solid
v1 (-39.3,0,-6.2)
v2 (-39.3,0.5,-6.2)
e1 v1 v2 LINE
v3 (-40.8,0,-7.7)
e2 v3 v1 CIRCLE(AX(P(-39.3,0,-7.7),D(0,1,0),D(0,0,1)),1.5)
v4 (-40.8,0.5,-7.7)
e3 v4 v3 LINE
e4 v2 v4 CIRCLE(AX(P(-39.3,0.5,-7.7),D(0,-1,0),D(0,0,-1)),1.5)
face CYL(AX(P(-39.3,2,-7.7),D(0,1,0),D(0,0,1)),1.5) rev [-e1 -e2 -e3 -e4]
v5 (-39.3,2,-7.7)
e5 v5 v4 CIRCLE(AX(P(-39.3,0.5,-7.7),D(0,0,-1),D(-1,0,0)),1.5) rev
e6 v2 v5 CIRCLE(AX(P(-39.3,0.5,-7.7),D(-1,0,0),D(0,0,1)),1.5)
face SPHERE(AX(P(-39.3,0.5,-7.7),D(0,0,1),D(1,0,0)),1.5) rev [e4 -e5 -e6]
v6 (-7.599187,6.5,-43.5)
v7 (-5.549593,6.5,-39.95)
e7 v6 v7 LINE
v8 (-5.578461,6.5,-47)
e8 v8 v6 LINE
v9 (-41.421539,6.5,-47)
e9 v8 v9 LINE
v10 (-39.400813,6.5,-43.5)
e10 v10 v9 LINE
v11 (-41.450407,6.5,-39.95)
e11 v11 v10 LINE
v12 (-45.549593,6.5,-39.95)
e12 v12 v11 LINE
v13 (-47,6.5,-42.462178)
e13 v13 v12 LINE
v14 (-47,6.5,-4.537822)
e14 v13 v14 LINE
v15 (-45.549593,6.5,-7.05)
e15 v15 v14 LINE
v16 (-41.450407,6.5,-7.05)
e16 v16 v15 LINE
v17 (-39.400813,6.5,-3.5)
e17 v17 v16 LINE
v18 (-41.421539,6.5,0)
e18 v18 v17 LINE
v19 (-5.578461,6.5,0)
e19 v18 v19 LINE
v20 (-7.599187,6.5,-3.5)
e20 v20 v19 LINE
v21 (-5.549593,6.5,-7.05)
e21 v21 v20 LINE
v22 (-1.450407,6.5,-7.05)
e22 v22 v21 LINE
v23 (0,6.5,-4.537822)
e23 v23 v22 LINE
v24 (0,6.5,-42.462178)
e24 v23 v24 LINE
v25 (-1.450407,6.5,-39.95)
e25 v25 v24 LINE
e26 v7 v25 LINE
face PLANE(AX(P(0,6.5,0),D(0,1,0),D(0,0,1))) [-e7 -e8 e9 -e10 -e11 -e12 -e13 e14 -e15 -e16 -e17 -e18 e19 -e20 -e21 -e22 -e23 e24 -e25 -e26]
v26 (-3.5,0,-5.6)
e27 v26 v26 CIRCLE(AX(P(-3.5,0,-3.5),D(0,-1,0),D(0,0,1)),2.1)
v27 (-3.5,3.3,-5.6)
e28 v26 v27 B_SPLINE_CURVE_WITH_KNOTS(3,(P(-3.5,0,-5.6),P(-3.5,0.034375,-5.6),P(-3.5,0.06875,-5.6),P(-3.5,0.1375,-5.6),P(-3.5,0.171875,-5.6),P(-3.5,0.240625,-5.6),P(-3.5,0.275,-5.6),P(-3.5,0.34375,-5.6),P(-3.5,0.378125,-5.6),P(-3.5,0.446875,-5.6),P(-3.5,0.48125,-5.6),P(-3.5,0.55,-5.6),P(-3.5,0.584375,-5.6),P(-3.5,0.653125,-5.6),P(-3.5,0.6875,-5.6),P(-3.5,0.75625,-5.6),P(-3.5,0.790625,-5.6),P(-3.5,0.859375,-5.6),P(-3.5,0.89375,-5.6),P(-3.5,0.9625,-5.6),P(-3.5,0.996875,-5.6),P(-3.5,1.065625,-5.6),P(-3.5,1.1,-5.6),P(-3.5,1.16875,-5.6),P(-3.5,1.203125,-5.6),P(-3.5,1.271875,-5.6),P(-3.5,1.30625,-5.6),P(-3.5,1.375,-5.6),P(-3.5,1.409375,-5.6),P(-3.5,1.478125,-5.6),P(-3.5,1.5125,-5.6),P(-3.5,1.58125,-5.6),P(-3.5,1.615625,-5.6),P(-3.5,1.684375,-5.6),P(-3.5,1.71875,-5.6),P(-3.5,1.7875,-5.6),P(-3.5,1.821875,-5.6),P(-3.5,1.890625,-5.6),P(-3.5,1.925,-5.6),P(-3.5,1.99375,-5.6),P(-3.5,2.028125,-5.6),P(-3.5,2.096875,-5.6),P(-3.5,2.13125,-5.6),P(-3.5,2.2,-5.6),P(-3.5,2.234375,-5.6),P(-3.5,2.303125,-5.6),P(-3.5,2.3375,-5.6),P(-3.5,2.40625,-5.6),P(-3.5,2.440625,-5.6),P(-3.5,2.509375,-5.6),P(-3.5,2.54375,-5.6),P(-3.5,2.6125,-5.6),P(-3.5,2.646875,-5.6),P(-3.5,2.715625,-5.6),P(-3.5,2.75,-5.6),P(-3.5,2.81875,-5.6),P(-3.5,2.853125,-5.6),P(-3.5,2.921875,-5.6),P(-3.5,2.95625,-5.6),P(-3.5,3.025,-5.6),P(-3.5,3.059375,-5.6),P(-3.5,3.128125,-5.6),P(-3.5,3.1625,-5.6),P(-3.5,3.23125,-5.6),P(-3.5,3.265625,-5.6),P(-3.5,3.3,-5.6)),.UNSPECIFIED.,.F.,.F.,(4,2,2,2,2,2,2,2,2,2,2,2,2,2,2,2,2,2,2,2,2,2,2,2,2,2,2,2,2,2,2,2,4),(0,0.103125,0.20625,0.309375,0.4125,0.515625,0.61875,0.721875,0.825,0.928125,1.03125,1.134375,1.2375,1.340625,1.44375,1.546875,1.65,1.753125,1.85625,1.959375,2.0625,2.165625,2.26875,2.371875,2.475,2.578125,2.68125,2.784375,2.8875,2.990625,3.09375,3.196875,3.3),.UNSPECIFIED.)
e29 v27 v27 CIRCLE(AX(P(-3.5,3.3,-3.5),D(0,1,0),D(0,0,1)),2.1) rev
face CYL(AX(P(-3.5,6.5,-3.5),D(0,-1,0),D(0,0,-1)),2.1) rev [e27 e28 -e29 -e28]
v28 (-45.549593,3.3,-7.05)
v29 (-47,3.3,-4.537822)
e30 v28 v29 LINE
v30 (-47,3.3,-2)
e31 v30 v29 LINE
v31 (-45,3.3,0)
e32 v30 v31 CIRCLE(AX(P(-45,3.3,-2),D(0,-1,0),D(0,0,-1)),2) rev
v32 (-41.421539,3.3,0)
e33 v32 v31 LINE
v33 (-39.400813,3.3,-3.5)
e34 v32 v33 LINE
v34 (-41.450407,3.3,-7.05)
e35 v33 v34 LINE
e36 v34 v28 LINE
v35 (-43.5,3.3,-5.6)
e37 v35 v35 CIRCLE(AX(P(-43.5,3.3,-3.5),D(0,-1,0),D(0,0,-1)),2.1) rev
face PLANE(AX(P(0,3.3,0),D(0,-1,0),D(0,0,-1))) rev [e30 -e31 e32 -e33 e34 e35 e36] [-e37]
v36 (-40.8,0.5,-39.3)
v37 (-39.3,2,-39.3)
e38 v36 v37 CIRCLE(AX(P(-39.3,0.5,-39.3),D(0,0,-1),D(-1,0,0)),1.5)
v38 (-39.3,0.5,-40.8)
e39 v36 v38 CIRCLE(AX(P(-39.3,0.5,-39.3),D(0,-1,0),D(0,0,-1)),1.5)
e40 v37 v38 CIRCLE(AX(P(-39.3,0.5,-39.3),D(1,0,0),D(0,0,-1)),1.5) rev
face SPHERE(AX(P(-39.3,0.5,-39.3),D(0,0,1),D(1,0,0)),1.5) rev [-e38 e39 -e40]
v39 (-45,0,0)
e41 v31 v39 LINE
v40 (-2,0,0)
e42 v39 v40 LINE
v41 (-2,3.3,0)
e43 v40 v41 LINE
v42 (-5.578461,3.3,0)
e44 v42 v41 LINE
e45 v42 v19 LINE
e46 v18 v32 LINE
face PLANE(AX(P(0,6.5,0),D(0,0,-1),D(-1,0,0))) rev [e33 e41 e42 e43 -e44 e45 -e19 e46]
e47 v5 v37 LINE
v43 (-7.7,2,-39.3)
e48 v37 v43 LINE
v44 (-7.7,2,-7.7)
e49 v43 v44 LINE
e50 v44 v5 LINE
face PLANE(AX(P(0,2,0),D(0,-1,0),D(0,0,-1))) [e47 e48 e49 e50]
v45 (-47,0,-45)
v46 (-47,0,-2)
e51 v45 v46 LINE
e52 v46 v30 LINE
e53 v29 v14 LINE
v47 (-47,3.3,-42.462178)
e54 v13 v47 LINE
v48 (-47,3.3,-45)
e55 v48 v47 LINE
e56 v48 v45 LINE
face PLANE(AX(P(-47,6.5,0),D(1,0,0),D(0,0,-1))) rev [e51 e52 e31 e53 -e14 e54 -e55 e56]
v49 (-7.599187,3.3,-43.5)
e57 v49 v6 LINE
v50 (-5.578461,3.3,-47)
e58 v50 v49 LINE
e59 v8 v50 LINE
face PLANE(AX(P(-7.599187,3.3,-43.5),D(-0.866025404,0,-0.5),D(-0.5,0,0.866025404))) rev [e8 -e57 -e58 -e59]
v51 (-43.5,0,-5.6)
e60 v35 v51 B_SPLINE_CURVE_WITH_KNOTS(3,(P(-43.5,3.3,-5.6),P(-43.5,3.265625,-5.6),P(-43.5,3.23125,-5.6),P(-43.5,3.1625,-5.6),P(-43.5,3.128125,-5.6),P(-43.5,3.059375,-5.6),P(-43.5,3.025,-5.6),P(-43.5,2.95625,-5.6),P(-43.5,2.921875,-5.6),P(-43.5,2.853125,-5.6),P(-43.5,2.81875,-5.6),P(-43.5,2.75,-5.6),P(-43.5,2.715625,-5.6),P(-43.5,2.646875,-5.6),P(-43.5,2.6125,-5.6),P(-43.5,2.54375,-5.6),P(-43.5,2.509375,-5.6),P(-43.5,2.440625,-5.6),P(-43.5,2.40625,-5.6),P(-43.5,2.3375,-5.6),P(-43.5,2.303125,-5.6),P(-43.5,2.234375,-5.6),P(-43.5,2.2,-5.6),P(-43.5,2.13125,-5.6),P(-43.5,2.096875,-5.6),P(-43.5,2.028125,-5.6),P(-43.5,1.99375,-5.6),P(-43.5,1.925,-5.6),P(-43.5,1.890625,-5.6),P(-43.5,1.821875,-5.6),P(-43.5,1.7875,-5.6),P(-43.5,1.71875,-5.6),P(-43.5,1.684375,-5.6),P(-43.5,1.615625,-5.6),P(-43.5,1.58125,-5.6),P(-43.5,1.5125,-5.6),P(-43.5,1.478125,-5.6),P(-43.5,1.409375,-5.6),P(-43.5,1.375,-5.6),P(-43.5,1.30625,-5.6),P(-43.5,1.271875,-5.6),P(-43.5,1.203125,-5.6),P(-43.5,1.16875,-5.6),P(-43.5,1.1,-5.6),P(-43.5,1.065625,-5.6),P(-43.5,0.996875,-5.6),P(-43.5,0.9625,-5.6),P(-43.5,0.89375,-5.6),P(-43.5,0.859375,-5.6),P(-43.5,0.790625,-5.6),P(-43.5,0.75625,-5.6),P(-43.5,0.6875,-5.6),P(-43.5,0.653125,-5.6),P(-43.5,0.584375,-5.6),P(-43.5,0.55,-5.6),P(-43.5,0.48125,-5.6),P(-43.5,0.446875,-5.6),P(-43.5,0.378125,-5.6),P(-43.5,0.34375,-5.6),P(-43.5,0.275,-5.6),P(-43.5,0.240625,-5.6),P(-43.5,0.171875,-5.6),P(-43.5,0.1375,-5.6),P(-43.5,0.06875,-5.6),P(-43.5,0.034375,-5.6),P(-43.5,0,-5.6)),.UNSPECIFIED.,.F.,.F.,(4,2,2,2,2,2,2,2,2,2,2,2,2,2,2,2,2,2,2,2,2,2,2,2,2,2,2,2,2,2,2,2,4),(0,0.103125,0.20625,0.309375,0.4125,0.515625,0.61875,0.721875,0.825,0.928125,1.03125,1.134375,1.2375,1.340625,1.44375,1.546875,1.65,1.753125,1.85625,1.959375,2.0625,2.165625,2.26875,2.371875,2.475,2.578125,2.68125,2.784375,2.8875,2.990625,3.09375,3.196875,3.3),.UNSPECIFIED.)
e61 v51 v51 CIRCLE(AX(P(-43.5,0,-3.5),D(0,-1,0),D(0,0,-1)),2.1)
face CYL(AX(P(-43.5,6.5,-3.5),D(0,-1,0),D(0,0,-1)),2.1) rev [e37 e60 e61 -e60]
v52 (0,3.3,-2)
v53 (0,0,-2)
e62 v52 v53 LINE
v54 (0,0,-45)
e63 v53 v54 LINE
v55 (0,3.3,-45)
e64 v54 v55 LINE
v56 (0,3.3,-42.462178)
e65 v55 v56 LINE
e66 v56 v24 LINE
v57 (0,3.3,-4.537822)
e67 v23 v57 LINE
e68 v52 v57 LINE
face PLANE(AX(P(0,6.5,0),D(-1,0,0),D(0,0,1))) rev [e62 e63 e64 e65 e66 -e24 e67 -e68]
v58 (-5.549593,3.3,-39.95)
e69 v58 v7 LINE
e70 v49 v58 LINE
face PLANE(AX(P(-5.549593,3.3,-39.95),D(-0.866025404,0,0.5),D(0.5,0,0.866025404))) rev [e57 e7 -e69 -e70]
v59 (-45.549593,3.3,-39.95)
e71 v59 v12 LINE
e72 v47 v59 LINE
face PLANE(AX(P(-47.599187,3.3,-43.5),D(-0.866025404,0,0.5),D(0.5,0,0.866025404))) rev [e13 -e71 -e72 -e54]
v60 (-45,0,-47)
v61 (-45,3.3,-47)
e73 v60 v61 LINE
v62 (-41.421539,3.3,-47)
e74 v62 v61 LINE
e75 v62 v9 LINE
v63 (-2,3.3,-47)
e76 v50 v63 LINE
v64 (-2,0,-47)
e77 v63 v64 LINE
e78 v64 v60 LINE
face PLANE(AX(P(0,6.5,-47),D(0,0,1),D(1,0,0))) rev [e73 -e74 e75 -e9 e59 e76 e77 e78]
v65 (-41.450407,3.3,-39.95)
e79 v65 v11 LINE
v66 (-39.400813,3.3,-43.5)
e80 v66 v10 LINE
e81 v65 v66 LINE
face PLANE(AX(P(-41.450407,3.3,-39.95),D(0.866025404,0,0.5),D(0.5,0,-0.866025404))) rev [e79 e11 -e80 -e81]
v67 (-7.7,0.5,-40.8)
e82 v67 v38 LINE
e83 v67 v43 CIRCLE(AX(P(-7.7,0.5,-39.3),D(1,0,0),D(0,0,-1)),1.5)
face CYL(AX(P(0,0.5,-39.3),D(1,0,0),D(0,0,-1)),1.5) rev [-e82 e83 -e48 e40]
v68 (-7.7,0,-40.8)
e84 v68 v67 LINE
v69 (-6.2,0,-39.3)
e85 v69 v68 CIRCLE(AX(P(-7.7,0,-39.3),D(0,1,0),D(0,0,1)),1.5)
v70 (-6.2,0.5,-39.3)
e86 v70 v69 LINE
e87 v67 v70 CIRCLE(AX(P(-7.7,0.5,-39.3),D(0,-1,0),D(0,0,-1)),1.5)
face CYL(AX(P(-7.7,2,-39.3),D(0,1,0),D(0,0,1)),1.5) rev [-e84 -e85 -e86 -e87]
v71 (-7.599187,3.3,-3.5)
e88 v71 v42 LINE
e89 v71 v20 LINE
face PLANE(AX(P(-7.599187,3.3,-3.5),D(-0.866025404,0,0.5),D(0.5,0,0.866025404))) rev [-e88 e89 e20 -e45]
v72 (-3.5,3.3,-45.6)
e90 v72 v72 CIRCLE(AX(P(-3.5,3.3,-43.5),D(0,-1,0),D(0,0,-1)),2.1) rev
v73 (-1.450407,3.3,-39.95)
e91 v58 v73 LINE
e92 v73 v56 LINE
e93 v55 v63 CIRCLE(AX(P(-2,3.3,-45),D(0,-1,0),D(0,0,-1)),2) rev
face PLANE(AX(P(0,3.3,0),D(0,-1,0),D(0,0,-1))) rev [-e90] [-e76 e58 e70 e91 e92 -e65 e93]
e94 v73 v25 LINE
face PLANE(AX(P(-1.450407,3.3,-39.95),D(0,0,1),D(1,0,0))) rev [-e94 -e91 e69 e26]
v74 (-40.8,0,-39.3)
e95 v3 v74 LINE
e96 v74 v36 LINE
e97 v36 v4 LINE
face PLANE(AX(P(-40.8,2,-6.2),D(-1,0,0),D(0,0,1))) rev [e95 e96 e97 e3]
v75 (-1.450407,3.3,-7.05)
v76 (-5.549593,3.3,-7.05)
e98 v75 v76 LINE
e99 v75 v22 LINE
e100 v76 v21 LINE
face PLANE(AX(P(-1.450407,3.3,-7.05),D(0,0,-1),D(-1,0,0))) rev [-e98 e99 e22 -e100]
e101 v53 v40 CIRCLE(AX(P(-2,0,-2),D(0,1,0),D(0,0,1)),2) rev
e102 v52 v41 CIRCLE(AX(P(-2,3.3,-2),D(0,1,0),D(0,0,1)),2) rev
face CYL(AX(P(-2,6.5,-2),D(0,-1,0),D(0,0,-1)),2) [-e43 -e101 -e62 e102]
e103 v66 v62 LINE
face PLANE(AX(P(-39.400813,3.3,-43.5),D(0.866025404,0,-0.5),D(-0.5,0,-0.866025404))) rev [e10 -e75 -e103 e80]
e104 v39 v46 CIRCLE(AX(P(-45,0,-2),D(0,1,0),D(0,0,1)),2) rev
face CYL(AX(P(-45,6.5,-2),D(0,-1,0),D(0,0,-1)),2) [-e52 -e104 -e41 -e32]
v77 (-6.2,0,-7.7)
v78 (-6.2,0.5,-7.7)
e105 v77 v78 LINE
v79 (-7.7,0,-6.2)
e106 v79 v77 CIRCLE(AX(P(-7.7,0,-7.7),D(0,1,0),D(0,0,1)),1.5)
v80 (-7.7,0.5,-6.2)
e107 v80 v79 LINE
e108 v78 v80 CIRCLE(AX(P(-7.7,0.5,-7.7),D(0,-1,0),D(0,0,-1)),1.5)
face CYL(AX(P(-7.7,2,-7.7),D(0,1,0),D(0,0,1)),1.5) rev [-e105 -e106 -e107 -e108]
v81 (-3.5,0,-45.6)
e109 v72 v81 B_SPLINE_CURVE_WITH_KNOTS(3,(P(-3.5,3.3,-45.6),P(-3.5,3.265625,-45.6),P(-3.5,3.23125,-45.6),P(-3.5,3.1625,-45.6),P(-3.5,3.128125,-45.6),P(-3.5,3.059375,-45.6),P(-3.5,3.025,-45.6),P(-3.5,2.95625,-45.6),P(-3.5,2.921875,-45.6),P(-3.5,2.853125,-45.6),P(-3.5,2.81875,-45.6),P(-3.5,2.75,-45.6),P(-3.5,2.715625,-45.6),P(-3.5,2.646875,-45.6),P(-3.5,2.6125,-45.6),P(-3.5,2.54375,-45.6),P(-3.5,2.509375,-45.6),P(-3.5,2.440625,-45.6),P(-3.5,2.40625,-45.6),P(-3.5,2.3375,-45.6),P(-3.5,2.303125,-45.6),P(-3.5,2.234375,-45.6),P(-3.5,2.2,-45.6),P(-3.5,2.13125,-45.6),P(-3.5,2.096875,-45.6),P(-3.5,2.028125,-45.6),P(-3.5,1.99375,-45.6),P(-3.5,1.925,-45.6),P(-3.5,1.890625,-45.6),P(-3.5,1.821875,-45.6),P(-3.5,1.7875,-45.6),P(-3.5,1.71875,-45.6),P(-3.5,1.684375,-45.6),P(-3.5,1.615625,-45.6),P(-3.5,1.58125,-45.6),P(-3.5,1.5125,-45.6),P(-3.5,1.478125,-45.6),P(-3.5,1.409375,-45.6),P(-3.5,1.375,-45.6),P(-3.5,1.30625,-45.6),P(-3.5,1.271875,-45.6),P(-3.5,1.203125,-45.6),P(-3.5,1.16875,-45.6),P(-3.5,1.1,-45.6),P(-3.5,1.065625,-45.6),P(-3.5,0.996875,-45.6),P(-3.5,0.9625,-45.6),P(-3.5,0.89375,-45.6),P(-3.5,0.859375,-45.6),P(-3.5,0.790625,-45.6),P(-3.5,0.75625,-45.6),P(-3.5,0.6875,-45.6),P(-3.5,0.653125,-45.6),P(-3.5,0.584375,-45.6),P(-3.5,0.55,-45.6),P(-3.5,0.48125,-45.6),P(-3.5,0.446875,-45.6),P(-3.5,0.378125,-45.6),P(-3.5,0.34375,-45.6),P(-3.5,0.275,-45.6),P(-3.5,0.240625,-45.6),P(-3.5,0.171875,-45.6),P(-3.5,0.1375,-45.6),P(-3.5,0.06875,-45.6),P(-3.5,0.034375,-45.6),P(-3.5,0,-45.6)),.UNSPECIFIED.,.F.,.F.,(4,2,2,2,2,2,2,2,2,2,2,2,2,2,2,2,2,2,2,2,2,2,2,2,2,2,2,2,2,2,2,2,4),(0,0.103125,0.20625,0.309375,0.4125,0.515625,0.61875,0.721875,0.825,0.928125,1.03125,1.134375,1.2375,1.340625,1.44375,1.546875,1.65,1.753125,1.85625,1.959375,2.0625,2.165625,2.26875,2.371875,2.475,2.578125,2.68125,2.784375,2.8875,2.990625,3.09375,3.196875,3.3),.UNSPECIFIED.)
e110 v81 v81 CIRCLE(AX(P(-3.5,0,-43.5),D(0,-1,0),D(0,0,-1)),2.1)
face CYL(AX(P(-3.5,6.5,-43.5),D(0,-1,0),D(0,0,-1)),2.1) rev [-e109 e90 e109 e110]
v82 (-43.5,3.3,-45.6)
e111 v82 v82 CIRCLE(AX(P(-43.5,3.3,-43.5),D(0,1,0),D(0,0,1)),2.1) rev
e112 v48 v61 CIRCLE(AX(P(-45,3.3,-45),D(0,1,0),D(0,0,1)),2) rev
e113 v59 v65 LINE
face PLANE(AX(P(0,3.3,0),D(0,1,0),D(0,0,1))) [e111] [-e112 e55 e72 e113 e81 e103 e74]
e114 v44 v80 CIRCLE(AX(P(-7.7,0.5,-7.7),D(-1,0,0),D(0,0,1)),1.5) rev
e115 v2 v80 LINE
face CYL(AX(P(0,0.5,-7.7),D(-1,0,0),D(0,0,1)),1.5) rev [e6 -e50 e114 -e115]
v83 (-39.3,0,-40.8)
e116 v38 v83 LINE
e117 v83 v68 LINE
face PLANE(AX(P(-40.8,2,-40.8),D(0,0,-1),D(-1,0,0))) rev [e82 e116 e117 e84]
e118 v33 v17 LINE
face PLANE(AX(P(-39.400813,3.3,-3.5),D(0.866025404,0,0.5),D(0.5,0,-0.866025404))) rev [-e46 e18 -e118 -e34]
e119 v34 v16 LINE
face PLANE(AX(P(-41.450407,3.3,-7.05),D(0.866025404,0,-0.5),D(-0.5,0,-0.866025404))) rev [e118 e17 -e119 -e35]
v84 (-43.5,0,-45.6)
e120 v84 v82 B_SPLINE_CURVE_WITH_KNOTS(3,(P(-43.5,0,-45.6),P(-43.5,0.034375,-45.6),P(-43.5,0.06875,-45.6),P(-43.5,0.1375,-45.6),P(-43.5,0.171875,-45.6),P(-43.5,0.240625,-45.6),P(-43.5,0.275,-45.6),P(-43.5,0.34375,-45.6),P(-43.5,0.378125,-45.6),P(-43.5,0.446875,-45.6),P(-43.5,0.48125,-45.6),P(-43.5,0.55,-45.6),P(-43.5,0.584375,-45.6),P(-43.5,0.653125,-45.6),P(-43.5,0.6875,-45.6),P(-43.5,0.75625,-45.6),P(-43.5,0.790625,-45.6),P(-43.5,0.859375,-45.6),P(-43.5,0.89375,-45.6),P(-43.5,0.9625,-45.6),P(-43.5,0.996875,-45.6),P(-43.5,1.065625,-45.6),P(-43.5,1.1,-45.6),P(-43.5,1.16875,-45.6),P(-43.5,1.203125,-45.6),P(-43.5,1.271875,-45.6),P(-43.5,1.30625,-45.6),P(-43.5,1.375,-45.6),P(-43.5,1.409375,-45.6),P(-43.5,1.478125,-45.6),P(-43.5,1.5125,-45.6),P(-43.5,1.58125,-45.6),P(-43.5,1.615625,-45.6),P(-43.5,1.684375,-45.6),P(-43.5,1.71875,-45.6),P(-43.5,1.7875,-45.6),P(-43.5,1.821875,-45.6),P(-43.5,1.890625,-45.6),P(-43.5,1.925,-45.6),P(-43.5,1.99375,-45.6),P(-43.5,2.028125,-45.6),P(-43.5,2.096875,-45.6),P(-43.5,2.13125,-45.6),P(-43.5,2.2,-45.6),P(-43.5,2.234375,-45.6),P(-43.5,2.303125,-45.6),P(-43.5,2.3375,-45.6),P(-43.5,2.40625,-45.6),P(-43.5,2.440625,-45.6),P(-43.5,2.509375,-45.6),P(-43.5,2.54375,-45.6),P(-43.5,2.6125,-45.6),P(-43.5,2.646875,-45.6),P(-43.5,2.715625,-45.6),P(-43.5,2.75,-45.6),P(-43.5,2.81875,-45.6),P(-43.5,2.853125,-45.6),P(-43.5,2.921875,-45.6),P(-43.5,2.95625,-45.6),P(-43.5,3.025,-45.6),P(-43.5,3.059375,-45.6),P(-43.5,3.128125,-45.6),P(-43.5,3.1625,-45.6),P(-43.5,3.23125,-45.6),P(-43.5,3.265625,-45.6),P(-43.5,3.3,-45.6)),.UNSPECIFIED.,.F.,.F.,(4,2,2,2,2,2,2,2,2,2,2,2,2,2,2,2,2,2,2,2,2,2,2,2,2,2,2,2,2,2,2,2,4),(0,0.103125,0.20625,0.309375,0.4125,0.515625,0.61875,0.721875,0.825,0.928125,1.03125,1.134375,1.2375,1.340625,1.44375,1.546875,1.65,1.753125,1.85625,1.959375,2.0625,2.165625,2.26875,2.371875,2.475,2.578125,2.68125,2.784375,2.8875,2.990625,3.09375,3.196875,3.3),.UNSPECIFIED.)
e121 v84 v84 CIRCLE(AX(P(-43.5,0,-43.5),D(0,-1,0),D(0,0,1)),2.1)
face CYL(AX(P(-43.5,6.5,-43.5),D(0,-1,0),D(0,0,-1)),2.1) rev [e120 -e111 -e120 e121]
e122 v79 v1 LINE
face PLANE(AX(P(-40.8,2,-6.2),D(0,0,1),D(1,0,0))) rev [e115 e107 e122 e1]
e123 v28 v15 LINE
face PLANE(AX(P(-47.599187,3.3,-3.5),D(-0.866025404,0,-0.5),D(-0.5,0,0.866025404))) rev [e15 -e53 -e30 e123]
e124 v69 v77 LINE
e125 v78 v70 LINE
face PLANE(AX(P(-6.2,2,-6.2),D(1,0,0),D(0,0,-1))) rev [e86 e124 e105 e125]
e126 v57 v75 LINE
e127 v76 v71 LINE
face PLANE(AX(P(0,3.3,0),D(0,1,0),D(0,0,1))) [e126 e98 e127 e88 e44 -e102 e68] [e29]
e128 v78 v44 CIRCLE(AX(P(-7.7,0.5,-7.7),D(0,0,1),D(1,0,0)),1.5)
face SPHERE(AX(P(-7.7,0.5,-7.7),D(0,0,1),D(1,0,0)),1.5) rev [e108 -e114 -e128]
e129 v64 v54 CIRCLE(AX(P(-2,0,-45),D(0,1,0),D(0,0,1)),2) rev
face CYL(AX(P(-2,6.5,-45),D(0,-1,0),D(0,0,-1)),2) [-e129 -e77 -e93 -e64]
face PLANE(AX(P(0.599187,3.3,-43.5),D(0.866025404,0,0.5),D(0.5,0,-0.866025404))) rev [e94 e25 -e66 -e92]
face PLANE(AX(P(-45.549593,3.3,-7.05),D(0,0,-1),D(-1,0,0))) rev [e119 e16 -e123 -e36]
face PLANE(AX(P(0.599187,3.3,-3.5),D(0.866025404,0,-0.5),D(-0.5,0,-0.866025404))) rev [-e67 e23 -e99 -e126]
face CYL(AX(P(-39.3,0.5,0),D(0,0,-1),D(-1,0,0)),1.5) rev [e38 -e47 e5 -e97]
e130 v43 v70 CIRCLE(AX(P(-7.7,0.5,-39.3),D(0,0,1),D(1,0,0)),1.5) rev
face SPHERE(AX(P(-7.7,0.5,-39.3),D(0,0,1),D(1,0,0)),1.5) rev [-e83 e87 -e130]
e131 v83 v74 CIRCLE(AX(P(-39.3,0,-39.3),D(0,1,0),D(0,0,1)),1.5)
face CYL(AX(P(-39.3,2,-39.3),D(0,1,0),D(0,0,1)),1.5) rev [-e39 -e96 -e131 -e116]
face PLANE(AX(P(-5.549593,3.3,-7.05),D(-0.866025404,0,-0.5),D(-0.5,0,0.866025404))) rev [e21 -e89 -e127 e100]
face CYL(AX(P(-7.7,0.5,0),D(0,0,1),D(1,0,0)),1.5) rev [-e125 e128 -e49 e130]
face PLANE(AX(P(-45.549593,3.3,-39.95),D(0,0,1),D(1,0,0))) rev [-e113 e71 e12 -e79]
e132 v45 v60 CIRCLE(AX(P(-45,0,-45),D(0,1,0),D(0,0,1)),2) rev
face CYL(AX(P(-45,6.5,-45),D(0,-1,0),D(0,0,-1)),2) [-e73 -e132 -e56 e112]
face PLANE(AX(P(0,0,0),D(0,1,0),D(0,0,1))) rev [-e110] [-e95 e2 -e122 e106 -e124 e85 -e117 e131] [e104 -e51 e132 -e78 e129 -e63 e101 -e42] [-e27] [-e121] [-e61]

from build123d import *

# Parameters (mm, degrees)
SKETCH_1_W          = 47
SKETCH_1_H          = 47
EXTRUDE_1_DEPTH     = 6.5
SKETCH_2_R          = 2.1
CUT_EXTRUDE_1_DEPTH = 67.785103129
SKETCH_3_W          = 34.6
SKETCH_3_H          = 34.6
CUT_EXTRUDE_2_DEPTH = 2
FILLET_1_R          = 2
FILLET_2_R          = 1.5
FILLET_3_R          = 1.5
CUT_EXTRUDE_3_DEPTH = 3.2
SKETCH_5_W          = 3.789230485
SKETCH_5_H          = 3.5
CUT_EXTRUDE_4_DEPTH = 3.2


with BuildPart() as part:
    # Эскиз1 → Бобышка-Вытянуть1 (new body)
    with BuildSketch(Plane(origin=(0, 0, 0), x_dir=(1, 0, 0), z_dir=(0, 1, 0))):
        with Locations((-23.5, 23.5)):
            Rectangle(SKETCH_1_W, SKETCH_1_H)
    extrude(amount=EXTRUDE_1_DEPTH)

    # Эскиз2 → Вырез-Вытянуть1 (cut, through all)
    with BuildSketch(Plane.XZ):
        with Locations(Location((-43.5, -3.5, 0), (0, 0, 270))):
            Circle(SKETCH_2_R)
        with Locations(Location((-3.5, -3.5, 0), (0, 0, 270))):
            Circle(SKETCH_2_R)
        with Locations(Location((-3.5, -43.5, 0), (0, 0, 270))):
            Circle(SKETCH_2_R)
        with Locations(Location((-43.5, -43.5, 0), (0, 0, 270))):
            Circle(SKETCH_2_R)
    extrude(amount=-CUT_EXTRUDE_1_DEPTH, mode=Mode.SUBTRACT)

    # Эскиз3 → Вырез-Вытянуть2 (cut)
    with BuildSketch(Plane.XZ):
        with Locations((-23.5, -23.5)):
            Rectangle(SKETCH_3_W, SKETCH_3_H)
    extrude(amount=-CUT_EXTRUDE_2_DEPTH, mode=Mode.SUBTRACT)

    # Скругление1
    fillet_1_edges = [part.edges().sort_by_distance(p)[0] for p in [
        (0, 3.25, 0),
        (-47, 3.25, 0),
        (-47, 3.25, -47),
        (0, 3.25, -47),
    ]]
    fillet(fillet_1_edges, radius=FILLET_1_R)

    # Скругление2
    fillet_2_edges = [part.edges().sort_by_distance(p)[0] for p in [
        (-40.8, 2, -23.5),
        (-23.5, 2, -6.2),
        (-6.2, 2, -23.5),
        (-23.5, 2, -40.8),
    ]]
    fillet(fillet_2_edges, radius=FILLET_2_R)

    # Скругление3
    # the kernel refuses this fillet: 1.5 mm, written as the material it adds along each edge
    with BuildSketch(Plane(origin=(-39.3, 0.5, -39.3), x_dir=(0, 0, -1), z_dir=(-1, 0, 0))) as fillet_3_piece_1_section:
        Polygon((0, 0), (FILLET_3_R, 0), (FILLET_3_R, -FILLET_3_R), (0, -FILLET_3_R), align=None)
    fillet_3_piece_1 = extrude(amount=FILLET_3_R, mode=Mode.PRIVATE)
    fillet_3_piece_1 = fillet_3_piece_1 - Plane(origin=(-39.3, 0.5, -39.3), x_dir=(0, -0.7071067811865475, 0.7071067811865475), z_dir=(-1, 0, 0)) * Sphere(FILLET_3_R, mode=Mode.PRIVATE)
    add(fillet_3_piece_1)
    with BuildSketch(Plane(origin=(-39.3, 0.5, -7.7), x_dir=(0, 0, 1), z_dir=(-1, 0, 0))) as fillet_3_piece_2_section:
        Polygon((0, 0), (FILLET_3_R, 0), (FILLET_3_R, FILLET_3_R), (0, FILLET_3_R), align=None)
    fillet_3_piece_2 = extrude(amount=FILLET_3_R, mode=Mode.PRIVATE)
    fillet_3_piece_2 = fillet_3_piece_2 - Plane(origin=(-39.3, 0.5, -7.7), x_dir=(0, -0.7071067811865475, -0.7071067811865475), z_dir=(-1, 0, 0)) * Sphere(FILLET_3_R, mode=Mode.PRIVATE)
    add(fillet_3_piece_2)
    with BuildSketch(Plane(origin=(-7.7, 0.5, -39.3), x_dir=(1, 0, 0), z_dir=(0, 0, -1))) as fillet_3_piece_3_section:
        Polygon((0, 0), (FILLET_3_R, 0), (FILLET_3_R, -FILLET_3_R), (0, -FILLET_3_R), align=None)
    fillet_3_piece_3 = extrude(amount=FILLET_3_R, mode=Mode.PRIVATE)
    fillet_3_piece_3 = fillet_3_piece_3 - Plane(origin=(-7.7, 0.5, -39.3), x_dir=(-0.7071067811865475, -0.7071067811865475, 0), z_dir=(0, 0, -1)) * Sphere(FILLET_3_R, mode=Mode.PRIVATE)
    add(fillet_3_piece_3)
    with BuildSketch(Plane(origin=(-7.7, 0.5, -7.7), x_dir=(1, 0, 0), z_dir=(0, 0, 1))) as fillet_3_piece_4_section:
        Polygon((0, 0), (FILLET_3_R, 0), (FILLET_3_R, FILLET_3_R), (0, FILLET_3_R), align=None)
    fillet_3_piece_4 = extrude(amount=FILLET_3_R, mode=Mode.PRIVATE)
    fillet_3_piece_4 = fillet_3_piece_4 - Plane(origin=(-7.7, 0.5, -7.7), x_dir=(-0.7071067811865475, -0.7071067811865475, 0), z_dir=(0, 0, 1)) * Sphere(FILLET_3_R, mode=Mode.PRIVATE)
    add(fillet_3_piece_4)
    with BuildSketch(Plane(origin=(-6.2, 0, -6.2), x_dir=(-1, 0, 0), z_dir=(0, 1, 0)), Plane(origin=(-40.8, 0, -6.2), x_dir=(0, 0, -1), z_dir=(0, 1, 0))) as fillet_3_piece_5:
        with BuildLine():
            CenterArc((FILLET_3_R, -FILLET_3_R), FILLET_3_R, 90, 90)
            Line((0, -FILLET_3_R), (0, 0))
            Line((0, 0), (FILLET_3_R, 0))
        make_face()
    extrude(amount=0.5)
    with BuildSketch(Plane(origin=(-6.2, 0, -40.8), x_dir=(-1, 0, 0), z_dir=(0, 1, 0)), Plane(origin=(-40.8, 0, -40.8), x_dir=(0, 0, 1), z_dir=(0, 1, 0))) as fillet_3_piece_6:
        with BuildLine():
            CenterArc((FILLET_3_R, FILLET_3_R), FILLET_3_R, 180, 90)
            Line((0, FILLET_3_R), (0, 0))
            Line((0, 0), (FILLET_3_R, 0))
        make_face()
    extrude(amount=0.5)

    # Эскиз4 → Вырез-Вытянуть3 (cut)
    with BuildSketch(Plane(origin=(0, 6.5, 0), x_dir=(1, 0, 0), z_dir=(0, 1, 0))):
        Polygon((-5.549593456, 39.95), (-7.599186911, 43.5), (-5.549593456, 47.05), (-1.450406544, 47.05), (0.599186911, 43.5), (-1.450406544, 39.95), align=None)
        Polygon((-39.400813089, 43.5), (-41.450406544, 47.05), (-45.549593456, 47.05), (-47.599186911, 43.5), (-45.549593456, 39.95), (-41.450406544, 39.95), align=None)
        Polygon((-1.450406544, 7.05), (-5.549593456, 7.05), (-7.599186911, 3.5), (-5.549593456, -0.05), (-1.450406544, -0.05), (0.599186911, 3.5), align=None)
        Polygon((-41.450406544, 7.05), (-39.400813089, 3.5), (-41.450406544, -0.05), (-45.549593456, -0.05), (-47.599186911, 3.5), (-45.549593456, 7.05), align=None)
    extrude(amount=-CUT_EXTRUDE_3_DEPTH, mode=Mode.SUBTRACT)

    # Эскиз5 → Вырез-Вытянуть4 (cut)
    with BuildSketch(Plane(origin=(0, 6.5, 0), x_dir=(1, 0, 0), z_dir=(0, 1, 0))):
        with Locations((-45.105384758, 45.25)):
            Rectangle(SKETCH_5_W, SKETCH_5_H)
        with Locations((-1.894615243, 45.25)):
            Rectangle(SKETCH_5_W, SKETCH_5_H)
        with Locations((-45.105384758, 1.75)):
            Rectangle(SKETCH_5_W, SKETCH_5_H)
        with Locations((-1.894615243, 1.75)):
            Rectangle(SKETCH_5_W, SKETCH_5_H)
    extrude(amount=-CUT_EXTRUDE_4_DEPTH, mode=Mode.SUBTRACT)


solid = part.part
